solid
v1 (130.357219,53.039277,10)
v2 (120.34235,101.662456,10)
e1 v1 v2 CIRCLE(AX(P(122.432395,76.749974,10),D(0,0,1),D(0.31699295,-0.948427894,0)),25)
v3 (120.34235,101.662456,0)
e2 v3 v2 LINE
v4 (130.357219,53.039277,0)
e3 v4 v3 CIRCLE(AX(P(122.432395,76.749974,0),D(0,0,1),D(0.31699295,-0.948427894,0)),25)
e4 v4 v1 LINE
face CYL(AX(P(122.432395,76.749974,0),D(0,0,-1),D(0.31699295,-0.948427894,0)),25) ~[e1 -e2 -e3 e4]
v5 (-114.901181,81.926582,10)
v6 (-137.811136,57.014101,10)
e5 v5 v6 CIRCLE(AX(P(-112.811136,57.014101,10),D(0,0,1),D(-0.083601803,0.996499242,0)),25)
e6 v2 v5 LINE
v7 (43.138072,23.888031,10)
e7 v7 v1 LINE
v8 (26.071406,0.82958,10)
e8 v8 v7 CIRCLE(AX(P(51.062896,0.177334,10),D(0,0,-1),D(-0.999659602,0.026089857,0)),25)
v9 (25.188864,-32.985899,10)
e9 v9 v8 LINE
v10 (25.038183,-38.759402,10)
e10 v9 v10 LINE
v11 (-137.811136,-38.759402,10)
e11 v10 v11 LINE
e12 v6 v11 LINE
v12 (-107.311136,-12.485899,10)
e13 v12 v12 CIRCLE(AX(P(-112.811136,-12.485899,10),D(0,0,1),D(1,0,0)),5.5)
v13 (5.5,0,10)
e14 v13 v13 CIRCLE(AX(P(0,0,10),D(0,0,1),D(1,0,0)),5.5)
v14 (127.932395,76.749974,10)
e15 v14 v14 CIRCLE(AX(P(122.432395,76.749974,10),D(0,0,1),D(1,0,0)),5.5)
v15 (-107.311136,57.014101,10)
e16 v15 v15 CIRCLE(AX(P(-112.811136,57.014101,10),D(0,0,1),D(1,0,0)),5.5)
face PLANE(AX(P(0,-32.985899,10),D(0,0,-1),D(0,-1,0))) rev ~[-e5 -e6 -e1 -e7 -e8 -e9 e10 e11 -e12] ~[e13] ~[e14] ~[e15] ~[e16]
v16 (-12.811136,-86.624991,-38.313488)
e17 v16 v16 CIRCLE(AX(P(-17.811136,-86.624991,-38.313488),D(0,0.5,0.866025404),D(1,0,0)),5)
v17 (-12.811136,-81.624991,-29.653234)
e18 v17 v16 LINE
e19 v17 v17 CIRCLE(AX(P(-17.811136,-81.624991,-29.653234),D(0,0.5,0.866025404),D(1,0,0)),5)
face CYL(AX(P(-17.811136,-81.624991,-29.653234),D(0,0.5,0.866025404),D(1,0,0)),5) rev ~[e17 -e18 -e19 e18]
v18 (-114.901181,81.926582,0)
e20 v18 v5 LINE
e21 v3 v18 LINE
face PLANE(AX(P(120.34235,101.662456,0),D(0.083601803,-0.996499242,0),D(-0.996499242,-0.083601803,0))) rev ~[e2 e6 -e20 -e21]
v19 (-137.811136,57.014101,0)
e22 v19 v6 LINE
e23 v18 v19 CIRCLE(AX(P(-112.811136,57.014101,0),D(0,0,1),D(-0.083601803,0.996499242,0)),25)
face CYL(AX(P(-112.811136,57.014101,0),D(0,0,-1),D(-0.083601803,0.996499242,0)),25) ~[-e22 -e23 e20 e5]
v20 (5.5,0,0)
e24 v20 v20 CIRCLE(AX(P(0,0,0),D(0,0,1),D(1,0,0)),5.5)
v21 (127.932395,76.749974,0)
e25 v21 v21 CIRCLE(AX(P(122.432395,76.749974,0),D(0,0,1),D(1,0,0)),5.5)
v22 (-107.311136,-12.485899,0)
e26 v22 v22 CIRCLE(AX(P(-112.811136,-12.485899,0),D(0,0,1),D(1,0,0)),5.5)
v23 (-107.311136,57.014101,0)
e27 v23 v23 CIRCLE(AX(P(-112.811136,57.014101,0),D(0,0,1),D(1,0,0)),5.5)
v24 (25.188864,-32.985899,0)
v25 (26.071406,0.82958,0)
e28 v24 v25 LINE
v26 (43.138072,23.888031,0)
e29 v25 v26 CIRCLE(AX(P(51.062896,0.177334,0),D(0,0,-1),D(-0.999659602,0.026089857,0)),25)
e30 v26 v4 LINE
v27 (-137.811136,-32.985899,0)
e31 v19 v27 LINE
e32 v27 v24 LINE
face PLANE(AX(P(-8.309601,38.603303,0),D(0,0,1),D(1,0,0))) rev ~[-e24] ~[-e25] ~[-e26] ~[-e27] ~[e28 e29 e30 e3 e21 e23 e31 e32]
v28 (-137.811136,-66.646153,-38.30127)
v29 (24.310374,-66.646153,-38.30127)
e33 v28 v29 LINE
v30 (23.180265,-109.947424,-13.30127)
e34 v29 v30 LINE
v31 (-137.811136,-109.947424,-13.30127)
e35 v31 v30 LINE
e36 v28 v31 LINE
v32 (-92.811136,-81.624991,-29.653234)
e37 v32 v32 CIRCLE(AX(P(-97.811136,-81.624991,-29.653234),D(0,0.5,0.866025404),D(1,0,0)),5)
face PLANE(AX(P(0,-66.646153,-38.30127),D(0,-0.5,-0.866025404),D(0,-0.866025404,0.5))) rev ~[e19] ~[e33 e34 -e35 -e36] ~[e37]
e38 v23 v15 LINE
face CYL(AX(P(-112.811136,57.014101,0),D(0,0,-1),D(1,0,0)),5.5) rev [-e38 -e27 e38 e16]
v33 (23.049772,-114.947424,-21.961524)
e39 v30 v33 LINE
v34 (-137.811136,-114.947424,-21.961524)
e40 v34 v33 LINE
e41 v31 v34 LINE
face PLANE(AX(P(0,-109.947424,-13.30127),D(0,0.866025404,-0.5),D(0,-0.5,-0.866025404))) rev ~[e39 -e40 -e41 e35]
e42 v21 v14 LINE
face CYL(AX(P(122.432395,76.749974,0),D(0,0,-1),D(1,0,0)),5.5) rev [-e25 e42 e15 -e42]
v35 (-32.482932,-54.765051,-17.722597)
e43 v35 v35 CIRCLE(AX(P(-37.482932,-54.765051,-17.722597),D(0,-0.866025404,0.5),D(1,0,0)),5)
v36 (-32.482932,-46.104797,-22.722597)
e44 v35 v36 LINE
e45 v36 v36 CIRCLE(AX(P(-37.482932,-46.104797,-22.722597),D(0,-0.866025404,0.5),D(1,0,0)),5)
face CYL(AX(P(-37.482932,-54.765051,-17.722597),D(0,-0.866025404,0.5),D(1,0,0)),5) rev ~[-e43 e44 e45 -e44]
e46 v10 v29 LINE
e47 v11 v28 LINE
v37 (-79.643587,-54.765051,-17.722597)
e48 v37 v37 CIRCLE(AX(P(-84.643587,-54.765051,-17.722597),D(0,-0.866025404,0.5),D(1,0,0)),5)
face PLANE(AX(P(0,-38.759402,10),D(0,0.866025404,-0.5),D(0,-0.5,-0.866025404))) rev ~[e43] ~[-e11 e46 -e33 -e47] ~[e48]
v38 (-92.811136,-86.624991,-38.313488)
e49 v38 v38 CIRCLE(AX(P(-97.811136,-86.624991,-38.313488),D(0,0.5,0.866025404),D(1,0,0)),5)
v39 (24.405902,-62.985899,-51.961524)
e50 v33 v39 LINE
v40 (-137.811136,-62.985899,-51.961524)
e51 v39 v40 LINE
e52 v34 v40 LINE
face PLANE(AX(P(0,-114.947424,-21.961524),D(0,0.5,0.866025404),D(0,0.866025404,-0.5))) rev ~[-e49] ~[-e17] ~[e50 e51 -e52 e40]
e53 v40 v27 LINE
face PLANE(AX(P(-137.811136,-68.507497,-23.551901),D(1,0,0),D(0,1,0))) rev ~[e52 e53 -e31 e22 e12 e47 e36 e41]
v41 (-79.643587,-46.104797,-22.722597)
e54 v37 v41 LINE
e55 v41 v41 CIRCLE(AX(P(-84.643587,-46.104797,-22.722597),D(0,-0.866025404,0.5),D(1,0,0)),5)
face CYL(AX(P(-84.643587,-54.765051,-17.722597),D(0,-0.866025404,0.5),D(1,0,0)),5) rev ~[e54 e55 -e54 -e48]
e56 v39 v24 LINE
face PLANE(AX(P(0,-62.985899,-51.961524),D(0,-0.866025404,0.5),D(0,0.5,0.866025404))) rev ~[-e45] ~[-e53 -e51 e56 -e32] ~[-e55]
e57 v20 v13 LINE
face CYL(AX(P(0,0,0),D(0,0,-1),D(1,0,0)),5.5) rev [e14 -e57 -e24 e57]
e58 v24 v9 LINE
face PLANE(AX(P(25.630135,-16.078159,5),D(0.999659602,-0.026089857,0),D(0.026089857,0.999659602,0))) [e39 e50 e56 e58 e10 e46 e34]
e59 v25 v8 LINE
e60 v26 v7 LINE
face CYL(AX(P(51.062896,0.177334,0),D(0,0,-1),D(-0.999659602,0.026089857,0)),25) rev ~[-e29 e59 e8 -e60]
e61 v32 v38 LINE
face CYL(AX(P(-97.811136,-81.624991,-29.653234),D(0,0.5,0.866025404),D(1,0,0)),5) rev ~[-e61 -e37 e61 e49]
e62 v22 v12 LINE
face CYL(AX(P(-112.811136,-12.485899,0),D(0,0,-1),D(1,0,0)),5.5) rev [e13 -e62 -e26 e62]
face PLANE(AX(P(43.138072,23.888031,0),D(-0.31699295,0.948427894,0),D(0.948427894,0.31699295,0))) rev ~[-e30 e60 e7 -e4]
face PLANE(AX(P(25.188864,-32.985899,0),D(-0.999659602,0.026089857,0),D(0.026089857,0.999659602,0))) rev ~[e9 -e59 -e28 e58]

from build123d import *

# Parameters (mm, degrees)
F0_R     = 5.5
F1_DEPTH = 10
F3_DEPTH = 137.8111356168
F4_REACH = 250.1802781517
F5_R     = 5
F6_DEPTH = 152.6664515987
F7_R     = 5
F8_DEPTH = 35.9817621135


with BuildPart() as f1:
    # F0 (on Top) → F1 (new body)
    with BuildSketch(Plane.XY):
        with BuildLine():
            ThreePointArc((-114.9011806829, 81.9265817605), (-131.2129171427, 73.936702076), (-137.8111356168, 57.0141007194))
            Line((-137.8111356168, 57.0141007194), (-137.8111356168, -32.9858992806))
            Line((-137.8111356168, -32.9858992806), (25.1888643832, -32.9858992806))
            Line((25.1888643832, -32.9858992806), (26.0714058339, 0.8295803985))
            ThreePointArc((26.0714058339, 0.8295803985), (30.9682705236, 15.0503307045), (43.1380721252, 23.8880313122))
            Line((43.1380721252, 23.8880313122), (130.3572190405, 53.0392771455))
            ThreePointArc((130.3572190405, 53.0392771455), (146.9184021007, 81.7933335256), (120.3423502221, 101.6624555296))
            Line((120.3423502221, 101.6624555296), (-114.9011806829, 81.9265817605))
        make_face()
        with Locations((-112.8111356168, -12.4858992806)):
            Circle(F0_R, mode=Mode.SUBTRACT)
        Circle(F0_R, mode=Mode.SUBTRACT)
        with Locations((-112.8111356168, 57.0141007194)):
            Circle(F0_R, mode=Mode.SUBTRACT)
        with Locations((122.4323952882, 76.7499744885)):
            Circle(F0_R, mode=Mode.SUBTRACT)
    extrude(amount=F1_DEPTH)

    # F2 (on Right) → F3 (join, through all)
    with BuildSketch(Plane.YZ):
        Polygon((-38.7594019725, 10), (-66.6461533184, -38.3012701892), (-109.9474235076, -13.3012701892), (-114.9474235076, -21.9615242271), (-62.9858992806, -51.9615242271), (-32.9858992806, 0), (-32.9858992806, 10), align=None)
    extrude(amount=-F3_DEPTH)

    f4_end = Plane(origin=(25.6301351085, -16.078159441, 5), x_dir=(0.0260898572, 0.9996596017, 0), z_dir=(0.9996596017, -0.0260898572, 0))
    # F2 (on Right) → F4 (join, up to a plane its end follows)
    with BuildSketch(Plane.YZ):
        Polygon((-38.7594019725, 10), (-66.6461533184, -38.3012701892), (-109.9474235076, -13.3012701892), (-114.9474235076, -21.9615242271), (-62.9858992806, -51.9615242271), (-32.9858992806, 0), (-32.9858992806, 10), align=None)
    f4_long = extrude(amount=F4_REACH, mode=Mode.PRIVATE)
    add(split(f4_long, bisect_by=f4_end, keep=Keep.BOTTOM, mode=Mode.PRIVATE))

    # F5 (on face) → F6 (cut, through all)
    with BuildSketch(Plane(origin=(0, -33.3996784983, 19.2833133718), x_dir=(1, 0, 0), z_dir=(0, -0.8660254038, 0.5))):
        with Locations((-84.6435874701, -42.7307449281)):
            Circle(F5_R)
        with Locations((-37.48293221, -42.7307449281)):
            Circle(F5_R)
    extrude(amount=-F6_DEPTH, mode=Mode.SUBTRACT)

    # F7 (on face) → F8 (cut, through all)
    with BuildSketch(Plane(origin=(0, -33.2464748201, -57.584583561), x_dir=(1, 0, 0), z_dir=(0, 0.5, 0.8660254038))):
        with Locations((-97.8111356168, -55.862698704)):
            Circle(F7_R)
        with Locations((-17.8111356168, -55.862698704)):
            Circle(F7_R)
    extrude(amount=-F8_DEPTH, mode=Mode.SUBTRACT)


solid = f1.part
